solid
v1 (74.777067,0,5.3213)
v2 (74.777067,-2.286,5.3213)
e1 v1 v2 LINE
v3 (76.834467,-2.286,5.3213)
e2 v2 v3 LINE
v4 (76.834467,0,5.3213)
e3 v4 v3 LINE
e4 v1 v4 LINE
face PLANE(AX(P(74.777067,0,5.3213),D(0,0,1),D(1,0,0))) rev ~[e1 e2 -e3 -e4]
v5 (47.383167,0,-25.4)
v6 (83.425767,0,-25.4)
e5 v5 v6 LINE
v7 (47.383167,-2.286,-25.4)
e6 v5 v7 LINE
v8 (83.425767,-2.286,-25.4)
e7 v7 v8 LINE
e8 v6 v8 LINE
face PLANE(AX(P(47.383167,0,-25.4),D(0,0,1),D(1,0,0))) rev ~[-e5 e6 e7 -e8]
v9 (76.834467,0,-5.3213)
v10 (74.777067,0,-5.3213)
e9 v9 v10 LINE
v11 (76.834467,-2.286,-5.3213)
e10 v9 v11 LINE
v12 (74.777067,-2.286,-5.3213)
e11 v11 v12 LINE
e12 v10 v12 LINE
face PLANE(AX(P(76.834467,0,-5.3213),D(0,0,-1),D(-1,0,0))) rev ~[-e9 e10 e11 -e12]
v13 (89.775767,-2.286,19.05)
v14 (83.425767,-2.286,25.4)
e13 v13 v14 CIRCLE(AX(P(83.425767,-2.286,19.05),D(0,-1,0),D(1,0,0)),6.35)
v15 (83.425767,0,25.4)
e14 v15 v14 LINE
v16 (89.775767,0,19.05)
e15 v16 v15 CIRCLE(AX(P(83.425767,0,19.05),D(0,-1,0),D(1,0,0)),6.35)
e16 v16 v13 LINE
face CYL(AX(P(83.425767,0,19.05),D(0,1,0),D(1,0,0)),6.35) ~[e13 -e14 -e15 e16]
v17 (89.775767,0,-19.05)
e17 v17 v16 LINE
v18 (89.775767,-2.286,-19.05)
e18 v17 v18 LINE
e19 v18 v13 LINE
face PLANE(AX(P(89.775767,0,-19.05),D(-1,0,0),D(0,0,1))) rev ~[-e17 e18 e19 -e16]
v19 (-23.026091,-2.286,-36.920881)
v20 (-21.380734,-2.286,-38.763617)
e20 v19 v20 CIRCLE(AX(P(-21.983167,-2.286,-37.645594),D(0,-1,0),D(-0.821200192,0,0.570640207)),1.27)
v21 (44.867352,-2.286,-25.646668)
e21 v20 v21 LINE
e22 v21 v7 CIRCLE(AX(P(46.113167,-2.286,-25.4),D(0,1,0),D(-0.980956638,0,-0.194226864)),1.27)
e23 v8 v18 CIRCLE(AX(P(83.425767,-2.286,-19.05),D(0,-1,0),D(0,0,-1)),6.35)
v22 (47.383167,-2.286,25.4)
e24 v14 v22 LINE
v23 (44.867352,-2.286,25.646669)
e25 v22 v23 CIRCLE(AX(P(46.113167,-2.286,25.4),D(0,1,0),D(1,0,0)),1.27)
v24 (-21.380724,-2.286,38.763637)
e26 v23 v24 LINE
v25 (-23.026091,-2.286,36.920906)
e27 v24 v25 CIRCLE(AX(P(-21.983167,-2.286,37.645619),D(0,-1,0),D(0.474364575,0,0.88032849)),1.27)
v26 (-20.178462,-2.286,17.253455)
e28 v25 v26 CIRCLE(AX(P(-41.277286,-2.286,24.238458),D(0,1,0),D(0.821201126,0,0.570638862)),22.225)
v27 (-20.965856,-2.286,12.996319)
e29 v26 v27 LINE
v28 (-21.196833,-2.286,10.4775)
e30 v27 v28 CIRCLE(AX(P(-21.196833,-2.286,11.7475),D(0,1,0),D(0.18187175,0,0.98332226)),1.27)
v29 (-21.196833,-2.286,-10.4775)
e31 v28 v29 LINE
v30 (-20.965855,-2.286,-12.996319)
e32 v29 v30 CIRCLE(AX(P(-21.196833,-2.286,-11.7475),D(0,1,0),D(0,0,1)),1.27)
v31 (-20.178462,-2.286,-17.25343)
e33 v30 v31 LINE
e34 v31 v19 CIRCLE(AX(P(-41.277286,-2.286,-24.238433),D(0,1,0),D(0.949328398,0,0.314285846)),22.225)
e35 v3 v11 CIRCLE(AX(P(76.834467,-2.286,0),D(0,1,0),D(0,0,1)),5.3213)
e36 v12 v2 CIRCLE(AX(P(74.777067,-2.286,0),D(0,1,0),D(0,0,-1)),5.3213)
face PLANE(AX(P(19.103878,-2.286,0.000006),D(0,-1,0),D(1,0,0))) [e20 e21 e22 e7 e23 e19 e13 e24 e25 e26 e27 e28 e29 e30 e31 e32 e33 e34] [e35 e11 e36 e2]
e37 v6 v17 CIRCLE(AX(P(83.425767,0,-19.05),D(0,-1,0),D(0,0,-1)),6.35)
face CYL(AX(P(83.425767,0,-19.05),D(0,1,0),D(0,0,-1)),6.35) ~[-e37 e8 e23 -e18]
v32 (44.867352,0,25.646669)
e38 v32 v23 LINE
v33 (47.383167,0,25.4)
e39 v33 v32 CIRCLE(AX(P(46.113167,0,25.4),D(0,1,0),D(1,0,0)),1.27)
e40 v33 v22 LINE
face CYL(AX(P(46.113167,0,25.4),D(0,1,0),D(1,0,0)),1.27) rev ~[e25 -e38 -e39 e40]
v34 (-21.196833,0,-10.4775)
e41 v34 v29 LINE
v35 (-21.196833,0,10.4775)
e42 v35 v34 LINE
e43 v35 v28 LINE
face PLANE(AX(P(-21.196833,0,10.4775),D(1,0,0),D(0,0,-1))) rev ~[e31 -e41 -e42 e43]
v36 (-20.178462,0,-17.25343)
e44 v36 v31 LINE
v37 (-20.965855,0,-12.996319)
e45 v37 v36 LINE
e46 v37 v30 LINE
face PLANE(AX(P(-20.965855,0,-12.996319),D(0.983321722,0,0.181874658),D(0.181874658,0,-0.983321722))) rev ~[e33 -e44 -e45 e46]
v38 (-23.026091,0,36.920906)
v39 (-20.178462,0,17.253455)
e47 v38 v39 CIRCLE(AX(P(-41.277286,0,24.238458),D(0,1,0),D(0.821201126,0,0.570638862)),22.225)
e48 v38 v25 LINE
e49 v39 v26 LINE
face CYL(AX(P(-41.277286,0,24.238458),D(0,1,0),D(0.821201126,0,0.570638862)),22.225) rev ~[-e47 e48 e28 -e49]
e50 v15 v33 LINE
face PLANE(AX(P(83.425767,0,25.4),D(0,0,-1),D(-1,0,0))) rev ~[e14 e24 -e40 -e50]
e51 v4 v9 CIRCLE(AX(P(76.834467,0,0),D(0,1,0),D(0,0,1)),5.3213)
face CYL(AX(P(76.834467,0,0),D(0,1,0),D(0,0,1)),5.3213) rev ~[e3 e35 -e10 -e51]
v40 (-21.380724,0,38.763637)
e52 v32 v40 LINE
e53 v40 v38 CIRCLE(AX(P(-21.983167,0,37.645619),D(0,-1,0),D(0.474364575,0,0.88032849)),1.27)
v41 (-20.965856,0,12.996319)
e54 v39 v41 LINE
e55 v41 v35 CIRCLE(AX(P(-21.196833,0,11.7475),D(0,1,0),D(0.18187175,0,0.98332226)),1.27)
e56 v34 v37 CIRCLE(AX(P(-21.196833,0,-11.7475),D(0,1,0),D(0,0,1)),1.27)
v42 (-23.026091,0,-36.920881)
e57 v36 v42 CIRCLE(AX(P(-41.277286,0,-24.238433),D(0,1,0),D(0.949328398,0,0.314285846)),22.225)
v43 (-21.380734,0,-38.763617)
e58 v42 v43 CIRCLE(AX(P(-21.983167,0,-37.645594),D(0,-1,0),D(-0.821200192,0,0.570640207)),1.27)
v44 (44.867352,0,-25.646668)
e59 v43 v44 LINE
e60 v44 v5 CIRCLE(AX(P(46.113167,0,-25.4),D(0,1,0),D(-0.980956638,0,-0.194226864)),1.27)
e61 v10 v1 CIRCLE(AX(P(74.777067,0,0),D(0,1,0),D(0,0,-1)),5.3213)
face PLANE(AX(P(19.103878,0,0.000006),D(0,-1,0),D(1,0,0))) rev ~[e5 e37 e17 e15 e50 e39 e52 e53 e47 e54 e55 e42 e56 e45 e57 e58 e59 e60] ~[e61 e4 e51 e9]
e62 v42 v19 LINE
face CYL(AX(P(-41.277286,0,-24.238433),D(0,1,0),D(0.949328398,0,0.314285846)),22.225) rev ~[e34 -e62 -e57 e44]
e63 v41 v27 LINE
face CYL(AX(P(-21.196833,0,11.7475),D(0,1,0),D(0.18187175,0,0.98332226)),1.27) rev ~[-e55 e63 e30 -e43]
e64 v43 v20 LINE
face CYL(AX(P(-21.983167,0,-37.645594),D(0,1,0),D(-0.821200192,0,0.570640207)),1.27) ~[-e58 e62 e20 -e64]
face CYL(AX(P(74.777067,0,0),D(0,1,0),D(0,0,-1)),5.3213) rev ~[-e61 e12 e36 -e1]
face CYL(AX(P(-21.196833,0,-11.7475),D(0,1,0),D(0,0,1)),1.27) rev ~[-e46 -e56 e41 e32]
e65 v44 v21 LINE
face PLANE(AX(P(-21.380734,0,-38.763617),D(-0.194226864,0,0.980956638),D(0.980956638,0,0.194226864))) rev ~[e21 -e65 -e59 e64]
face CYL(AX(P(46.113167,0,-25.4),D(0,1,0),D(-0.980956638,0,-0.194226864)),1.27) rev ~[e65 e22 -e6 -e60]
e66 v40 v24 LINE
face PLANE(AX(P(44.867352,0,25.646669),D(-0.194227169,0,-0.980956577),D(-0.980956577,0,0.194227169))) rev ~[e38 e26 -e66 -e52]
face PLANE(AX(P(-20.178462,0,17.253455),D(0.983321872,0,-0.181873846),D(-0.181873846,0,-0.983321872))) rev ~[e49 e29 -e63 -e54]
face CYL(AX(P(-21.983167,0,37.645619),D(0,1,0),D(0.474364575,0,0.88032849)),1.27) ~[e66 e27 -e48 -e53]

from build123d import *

# Parameters (mm, degrees)
F1_DEPTH = 2.286


# Not quite as in the source:
# - ends of sketch curves that miss each other by under 0.0002 mm in the source are joined


with BuildPart() as f1:
    # F0 (on Front) → F1 (new body)
    with BuildSketch(Plane.XZ):
        with BuildLine():
            ThreePointArc((-20.1784623574, -17.2534296725), (-19.281646508, -27.4231568168), (-23.0260908036, -36.9208810585))
            ThreePointArc((-23.0260908036, -36.9208810585), (-22.9304929279, -38.4914502694), (-21.3807341969, -38.7636168977))
            Line((-21.3807341969, -38.7636168977), (44.86735167, -25.6466681175))
            ThreePointArc((44.86735167, -25.6466681175), (45.9892411408, -24.1360607291), (47.3831666, -25.4))
            Line((47.3831666, -25.4), (76.8344666, -5.3213))
            Line((76.8344666, -5.3213), (74.7770666, -5.3213))
            ThreePointArc((74.7770666, -5.3213), (69.4557666, 0), (74.7770666, 5.3213))
            Line((74.7770666, 5.3213), (76.8344666, 5.3213))
            Line((76.8344666, 5.3213), (47.3831666, 25.4))
            ThreePointArc((47.3831666, 25.4), (45.9892409445, 24.1360607483), (44.8673517466, 25.6466685044))
            Line((44.8673517466, 25.6466685044), (-21.38072359, 38.7636365822))
            ThreePointArc((-21.38072359, 38.7636365822), (-22.9304889155, 38.4914801631), (-23.026090887, 36.9209064006))
            ThreePointArc((-23.026090887, 36.9209064006), (-19.281646508, 27.4231822168), (-20.1784623574, 17.2534550725))
            Line((-20.1784623574, 17.2534550725), (-20.9658562769, 12.9963192698))
            ThreePointArc((-20.9658562769, 12.9963192698), (-19.9321396678, 11.6315268838), (-21.1968334, 10.4775))
            Line((-21.1968334, 10.4775), (-21.1968334, -10.4775))
            ThreePointArc((-21.1968334, -10.4775), (-19.9321397156, -11.6315263621), (-20.9658552466, -12.9963190792))
            Line((-20.9658552466, -12.9963190792), (-20.1784623574, -17.2534296725))
        make_face()
        with BuildLine():
            Line((76.8344666, -5.3213), (47.3831666, -25.4))
            Line((47.3831666, -25.4), (83.4257666, -25.4))
            ThreePointArc((83.4257666, -25.4), (87.9158946605, -23.5401280605), (89.7757666, -19.05))
            Line((89.7757666, -19.05), (89.7757666, 19.05))
            ThreePointArc((89.7757666, 19.05), (87.9158946605, 23.5401280605), (83.4257666, 25.4))
            Line((83.4257666, 25.4), (47.3831666, 25.4))
            Line((47.3831666, 25.4), (76.8344666, 5.3213))
            ThreePointArc((76.8344666, 5.3213), (82.1557666, 0), (76.8344666, -5.3213))
        make_face()
    extrude(amount=F1_DEPTH)


solid = f1.part
